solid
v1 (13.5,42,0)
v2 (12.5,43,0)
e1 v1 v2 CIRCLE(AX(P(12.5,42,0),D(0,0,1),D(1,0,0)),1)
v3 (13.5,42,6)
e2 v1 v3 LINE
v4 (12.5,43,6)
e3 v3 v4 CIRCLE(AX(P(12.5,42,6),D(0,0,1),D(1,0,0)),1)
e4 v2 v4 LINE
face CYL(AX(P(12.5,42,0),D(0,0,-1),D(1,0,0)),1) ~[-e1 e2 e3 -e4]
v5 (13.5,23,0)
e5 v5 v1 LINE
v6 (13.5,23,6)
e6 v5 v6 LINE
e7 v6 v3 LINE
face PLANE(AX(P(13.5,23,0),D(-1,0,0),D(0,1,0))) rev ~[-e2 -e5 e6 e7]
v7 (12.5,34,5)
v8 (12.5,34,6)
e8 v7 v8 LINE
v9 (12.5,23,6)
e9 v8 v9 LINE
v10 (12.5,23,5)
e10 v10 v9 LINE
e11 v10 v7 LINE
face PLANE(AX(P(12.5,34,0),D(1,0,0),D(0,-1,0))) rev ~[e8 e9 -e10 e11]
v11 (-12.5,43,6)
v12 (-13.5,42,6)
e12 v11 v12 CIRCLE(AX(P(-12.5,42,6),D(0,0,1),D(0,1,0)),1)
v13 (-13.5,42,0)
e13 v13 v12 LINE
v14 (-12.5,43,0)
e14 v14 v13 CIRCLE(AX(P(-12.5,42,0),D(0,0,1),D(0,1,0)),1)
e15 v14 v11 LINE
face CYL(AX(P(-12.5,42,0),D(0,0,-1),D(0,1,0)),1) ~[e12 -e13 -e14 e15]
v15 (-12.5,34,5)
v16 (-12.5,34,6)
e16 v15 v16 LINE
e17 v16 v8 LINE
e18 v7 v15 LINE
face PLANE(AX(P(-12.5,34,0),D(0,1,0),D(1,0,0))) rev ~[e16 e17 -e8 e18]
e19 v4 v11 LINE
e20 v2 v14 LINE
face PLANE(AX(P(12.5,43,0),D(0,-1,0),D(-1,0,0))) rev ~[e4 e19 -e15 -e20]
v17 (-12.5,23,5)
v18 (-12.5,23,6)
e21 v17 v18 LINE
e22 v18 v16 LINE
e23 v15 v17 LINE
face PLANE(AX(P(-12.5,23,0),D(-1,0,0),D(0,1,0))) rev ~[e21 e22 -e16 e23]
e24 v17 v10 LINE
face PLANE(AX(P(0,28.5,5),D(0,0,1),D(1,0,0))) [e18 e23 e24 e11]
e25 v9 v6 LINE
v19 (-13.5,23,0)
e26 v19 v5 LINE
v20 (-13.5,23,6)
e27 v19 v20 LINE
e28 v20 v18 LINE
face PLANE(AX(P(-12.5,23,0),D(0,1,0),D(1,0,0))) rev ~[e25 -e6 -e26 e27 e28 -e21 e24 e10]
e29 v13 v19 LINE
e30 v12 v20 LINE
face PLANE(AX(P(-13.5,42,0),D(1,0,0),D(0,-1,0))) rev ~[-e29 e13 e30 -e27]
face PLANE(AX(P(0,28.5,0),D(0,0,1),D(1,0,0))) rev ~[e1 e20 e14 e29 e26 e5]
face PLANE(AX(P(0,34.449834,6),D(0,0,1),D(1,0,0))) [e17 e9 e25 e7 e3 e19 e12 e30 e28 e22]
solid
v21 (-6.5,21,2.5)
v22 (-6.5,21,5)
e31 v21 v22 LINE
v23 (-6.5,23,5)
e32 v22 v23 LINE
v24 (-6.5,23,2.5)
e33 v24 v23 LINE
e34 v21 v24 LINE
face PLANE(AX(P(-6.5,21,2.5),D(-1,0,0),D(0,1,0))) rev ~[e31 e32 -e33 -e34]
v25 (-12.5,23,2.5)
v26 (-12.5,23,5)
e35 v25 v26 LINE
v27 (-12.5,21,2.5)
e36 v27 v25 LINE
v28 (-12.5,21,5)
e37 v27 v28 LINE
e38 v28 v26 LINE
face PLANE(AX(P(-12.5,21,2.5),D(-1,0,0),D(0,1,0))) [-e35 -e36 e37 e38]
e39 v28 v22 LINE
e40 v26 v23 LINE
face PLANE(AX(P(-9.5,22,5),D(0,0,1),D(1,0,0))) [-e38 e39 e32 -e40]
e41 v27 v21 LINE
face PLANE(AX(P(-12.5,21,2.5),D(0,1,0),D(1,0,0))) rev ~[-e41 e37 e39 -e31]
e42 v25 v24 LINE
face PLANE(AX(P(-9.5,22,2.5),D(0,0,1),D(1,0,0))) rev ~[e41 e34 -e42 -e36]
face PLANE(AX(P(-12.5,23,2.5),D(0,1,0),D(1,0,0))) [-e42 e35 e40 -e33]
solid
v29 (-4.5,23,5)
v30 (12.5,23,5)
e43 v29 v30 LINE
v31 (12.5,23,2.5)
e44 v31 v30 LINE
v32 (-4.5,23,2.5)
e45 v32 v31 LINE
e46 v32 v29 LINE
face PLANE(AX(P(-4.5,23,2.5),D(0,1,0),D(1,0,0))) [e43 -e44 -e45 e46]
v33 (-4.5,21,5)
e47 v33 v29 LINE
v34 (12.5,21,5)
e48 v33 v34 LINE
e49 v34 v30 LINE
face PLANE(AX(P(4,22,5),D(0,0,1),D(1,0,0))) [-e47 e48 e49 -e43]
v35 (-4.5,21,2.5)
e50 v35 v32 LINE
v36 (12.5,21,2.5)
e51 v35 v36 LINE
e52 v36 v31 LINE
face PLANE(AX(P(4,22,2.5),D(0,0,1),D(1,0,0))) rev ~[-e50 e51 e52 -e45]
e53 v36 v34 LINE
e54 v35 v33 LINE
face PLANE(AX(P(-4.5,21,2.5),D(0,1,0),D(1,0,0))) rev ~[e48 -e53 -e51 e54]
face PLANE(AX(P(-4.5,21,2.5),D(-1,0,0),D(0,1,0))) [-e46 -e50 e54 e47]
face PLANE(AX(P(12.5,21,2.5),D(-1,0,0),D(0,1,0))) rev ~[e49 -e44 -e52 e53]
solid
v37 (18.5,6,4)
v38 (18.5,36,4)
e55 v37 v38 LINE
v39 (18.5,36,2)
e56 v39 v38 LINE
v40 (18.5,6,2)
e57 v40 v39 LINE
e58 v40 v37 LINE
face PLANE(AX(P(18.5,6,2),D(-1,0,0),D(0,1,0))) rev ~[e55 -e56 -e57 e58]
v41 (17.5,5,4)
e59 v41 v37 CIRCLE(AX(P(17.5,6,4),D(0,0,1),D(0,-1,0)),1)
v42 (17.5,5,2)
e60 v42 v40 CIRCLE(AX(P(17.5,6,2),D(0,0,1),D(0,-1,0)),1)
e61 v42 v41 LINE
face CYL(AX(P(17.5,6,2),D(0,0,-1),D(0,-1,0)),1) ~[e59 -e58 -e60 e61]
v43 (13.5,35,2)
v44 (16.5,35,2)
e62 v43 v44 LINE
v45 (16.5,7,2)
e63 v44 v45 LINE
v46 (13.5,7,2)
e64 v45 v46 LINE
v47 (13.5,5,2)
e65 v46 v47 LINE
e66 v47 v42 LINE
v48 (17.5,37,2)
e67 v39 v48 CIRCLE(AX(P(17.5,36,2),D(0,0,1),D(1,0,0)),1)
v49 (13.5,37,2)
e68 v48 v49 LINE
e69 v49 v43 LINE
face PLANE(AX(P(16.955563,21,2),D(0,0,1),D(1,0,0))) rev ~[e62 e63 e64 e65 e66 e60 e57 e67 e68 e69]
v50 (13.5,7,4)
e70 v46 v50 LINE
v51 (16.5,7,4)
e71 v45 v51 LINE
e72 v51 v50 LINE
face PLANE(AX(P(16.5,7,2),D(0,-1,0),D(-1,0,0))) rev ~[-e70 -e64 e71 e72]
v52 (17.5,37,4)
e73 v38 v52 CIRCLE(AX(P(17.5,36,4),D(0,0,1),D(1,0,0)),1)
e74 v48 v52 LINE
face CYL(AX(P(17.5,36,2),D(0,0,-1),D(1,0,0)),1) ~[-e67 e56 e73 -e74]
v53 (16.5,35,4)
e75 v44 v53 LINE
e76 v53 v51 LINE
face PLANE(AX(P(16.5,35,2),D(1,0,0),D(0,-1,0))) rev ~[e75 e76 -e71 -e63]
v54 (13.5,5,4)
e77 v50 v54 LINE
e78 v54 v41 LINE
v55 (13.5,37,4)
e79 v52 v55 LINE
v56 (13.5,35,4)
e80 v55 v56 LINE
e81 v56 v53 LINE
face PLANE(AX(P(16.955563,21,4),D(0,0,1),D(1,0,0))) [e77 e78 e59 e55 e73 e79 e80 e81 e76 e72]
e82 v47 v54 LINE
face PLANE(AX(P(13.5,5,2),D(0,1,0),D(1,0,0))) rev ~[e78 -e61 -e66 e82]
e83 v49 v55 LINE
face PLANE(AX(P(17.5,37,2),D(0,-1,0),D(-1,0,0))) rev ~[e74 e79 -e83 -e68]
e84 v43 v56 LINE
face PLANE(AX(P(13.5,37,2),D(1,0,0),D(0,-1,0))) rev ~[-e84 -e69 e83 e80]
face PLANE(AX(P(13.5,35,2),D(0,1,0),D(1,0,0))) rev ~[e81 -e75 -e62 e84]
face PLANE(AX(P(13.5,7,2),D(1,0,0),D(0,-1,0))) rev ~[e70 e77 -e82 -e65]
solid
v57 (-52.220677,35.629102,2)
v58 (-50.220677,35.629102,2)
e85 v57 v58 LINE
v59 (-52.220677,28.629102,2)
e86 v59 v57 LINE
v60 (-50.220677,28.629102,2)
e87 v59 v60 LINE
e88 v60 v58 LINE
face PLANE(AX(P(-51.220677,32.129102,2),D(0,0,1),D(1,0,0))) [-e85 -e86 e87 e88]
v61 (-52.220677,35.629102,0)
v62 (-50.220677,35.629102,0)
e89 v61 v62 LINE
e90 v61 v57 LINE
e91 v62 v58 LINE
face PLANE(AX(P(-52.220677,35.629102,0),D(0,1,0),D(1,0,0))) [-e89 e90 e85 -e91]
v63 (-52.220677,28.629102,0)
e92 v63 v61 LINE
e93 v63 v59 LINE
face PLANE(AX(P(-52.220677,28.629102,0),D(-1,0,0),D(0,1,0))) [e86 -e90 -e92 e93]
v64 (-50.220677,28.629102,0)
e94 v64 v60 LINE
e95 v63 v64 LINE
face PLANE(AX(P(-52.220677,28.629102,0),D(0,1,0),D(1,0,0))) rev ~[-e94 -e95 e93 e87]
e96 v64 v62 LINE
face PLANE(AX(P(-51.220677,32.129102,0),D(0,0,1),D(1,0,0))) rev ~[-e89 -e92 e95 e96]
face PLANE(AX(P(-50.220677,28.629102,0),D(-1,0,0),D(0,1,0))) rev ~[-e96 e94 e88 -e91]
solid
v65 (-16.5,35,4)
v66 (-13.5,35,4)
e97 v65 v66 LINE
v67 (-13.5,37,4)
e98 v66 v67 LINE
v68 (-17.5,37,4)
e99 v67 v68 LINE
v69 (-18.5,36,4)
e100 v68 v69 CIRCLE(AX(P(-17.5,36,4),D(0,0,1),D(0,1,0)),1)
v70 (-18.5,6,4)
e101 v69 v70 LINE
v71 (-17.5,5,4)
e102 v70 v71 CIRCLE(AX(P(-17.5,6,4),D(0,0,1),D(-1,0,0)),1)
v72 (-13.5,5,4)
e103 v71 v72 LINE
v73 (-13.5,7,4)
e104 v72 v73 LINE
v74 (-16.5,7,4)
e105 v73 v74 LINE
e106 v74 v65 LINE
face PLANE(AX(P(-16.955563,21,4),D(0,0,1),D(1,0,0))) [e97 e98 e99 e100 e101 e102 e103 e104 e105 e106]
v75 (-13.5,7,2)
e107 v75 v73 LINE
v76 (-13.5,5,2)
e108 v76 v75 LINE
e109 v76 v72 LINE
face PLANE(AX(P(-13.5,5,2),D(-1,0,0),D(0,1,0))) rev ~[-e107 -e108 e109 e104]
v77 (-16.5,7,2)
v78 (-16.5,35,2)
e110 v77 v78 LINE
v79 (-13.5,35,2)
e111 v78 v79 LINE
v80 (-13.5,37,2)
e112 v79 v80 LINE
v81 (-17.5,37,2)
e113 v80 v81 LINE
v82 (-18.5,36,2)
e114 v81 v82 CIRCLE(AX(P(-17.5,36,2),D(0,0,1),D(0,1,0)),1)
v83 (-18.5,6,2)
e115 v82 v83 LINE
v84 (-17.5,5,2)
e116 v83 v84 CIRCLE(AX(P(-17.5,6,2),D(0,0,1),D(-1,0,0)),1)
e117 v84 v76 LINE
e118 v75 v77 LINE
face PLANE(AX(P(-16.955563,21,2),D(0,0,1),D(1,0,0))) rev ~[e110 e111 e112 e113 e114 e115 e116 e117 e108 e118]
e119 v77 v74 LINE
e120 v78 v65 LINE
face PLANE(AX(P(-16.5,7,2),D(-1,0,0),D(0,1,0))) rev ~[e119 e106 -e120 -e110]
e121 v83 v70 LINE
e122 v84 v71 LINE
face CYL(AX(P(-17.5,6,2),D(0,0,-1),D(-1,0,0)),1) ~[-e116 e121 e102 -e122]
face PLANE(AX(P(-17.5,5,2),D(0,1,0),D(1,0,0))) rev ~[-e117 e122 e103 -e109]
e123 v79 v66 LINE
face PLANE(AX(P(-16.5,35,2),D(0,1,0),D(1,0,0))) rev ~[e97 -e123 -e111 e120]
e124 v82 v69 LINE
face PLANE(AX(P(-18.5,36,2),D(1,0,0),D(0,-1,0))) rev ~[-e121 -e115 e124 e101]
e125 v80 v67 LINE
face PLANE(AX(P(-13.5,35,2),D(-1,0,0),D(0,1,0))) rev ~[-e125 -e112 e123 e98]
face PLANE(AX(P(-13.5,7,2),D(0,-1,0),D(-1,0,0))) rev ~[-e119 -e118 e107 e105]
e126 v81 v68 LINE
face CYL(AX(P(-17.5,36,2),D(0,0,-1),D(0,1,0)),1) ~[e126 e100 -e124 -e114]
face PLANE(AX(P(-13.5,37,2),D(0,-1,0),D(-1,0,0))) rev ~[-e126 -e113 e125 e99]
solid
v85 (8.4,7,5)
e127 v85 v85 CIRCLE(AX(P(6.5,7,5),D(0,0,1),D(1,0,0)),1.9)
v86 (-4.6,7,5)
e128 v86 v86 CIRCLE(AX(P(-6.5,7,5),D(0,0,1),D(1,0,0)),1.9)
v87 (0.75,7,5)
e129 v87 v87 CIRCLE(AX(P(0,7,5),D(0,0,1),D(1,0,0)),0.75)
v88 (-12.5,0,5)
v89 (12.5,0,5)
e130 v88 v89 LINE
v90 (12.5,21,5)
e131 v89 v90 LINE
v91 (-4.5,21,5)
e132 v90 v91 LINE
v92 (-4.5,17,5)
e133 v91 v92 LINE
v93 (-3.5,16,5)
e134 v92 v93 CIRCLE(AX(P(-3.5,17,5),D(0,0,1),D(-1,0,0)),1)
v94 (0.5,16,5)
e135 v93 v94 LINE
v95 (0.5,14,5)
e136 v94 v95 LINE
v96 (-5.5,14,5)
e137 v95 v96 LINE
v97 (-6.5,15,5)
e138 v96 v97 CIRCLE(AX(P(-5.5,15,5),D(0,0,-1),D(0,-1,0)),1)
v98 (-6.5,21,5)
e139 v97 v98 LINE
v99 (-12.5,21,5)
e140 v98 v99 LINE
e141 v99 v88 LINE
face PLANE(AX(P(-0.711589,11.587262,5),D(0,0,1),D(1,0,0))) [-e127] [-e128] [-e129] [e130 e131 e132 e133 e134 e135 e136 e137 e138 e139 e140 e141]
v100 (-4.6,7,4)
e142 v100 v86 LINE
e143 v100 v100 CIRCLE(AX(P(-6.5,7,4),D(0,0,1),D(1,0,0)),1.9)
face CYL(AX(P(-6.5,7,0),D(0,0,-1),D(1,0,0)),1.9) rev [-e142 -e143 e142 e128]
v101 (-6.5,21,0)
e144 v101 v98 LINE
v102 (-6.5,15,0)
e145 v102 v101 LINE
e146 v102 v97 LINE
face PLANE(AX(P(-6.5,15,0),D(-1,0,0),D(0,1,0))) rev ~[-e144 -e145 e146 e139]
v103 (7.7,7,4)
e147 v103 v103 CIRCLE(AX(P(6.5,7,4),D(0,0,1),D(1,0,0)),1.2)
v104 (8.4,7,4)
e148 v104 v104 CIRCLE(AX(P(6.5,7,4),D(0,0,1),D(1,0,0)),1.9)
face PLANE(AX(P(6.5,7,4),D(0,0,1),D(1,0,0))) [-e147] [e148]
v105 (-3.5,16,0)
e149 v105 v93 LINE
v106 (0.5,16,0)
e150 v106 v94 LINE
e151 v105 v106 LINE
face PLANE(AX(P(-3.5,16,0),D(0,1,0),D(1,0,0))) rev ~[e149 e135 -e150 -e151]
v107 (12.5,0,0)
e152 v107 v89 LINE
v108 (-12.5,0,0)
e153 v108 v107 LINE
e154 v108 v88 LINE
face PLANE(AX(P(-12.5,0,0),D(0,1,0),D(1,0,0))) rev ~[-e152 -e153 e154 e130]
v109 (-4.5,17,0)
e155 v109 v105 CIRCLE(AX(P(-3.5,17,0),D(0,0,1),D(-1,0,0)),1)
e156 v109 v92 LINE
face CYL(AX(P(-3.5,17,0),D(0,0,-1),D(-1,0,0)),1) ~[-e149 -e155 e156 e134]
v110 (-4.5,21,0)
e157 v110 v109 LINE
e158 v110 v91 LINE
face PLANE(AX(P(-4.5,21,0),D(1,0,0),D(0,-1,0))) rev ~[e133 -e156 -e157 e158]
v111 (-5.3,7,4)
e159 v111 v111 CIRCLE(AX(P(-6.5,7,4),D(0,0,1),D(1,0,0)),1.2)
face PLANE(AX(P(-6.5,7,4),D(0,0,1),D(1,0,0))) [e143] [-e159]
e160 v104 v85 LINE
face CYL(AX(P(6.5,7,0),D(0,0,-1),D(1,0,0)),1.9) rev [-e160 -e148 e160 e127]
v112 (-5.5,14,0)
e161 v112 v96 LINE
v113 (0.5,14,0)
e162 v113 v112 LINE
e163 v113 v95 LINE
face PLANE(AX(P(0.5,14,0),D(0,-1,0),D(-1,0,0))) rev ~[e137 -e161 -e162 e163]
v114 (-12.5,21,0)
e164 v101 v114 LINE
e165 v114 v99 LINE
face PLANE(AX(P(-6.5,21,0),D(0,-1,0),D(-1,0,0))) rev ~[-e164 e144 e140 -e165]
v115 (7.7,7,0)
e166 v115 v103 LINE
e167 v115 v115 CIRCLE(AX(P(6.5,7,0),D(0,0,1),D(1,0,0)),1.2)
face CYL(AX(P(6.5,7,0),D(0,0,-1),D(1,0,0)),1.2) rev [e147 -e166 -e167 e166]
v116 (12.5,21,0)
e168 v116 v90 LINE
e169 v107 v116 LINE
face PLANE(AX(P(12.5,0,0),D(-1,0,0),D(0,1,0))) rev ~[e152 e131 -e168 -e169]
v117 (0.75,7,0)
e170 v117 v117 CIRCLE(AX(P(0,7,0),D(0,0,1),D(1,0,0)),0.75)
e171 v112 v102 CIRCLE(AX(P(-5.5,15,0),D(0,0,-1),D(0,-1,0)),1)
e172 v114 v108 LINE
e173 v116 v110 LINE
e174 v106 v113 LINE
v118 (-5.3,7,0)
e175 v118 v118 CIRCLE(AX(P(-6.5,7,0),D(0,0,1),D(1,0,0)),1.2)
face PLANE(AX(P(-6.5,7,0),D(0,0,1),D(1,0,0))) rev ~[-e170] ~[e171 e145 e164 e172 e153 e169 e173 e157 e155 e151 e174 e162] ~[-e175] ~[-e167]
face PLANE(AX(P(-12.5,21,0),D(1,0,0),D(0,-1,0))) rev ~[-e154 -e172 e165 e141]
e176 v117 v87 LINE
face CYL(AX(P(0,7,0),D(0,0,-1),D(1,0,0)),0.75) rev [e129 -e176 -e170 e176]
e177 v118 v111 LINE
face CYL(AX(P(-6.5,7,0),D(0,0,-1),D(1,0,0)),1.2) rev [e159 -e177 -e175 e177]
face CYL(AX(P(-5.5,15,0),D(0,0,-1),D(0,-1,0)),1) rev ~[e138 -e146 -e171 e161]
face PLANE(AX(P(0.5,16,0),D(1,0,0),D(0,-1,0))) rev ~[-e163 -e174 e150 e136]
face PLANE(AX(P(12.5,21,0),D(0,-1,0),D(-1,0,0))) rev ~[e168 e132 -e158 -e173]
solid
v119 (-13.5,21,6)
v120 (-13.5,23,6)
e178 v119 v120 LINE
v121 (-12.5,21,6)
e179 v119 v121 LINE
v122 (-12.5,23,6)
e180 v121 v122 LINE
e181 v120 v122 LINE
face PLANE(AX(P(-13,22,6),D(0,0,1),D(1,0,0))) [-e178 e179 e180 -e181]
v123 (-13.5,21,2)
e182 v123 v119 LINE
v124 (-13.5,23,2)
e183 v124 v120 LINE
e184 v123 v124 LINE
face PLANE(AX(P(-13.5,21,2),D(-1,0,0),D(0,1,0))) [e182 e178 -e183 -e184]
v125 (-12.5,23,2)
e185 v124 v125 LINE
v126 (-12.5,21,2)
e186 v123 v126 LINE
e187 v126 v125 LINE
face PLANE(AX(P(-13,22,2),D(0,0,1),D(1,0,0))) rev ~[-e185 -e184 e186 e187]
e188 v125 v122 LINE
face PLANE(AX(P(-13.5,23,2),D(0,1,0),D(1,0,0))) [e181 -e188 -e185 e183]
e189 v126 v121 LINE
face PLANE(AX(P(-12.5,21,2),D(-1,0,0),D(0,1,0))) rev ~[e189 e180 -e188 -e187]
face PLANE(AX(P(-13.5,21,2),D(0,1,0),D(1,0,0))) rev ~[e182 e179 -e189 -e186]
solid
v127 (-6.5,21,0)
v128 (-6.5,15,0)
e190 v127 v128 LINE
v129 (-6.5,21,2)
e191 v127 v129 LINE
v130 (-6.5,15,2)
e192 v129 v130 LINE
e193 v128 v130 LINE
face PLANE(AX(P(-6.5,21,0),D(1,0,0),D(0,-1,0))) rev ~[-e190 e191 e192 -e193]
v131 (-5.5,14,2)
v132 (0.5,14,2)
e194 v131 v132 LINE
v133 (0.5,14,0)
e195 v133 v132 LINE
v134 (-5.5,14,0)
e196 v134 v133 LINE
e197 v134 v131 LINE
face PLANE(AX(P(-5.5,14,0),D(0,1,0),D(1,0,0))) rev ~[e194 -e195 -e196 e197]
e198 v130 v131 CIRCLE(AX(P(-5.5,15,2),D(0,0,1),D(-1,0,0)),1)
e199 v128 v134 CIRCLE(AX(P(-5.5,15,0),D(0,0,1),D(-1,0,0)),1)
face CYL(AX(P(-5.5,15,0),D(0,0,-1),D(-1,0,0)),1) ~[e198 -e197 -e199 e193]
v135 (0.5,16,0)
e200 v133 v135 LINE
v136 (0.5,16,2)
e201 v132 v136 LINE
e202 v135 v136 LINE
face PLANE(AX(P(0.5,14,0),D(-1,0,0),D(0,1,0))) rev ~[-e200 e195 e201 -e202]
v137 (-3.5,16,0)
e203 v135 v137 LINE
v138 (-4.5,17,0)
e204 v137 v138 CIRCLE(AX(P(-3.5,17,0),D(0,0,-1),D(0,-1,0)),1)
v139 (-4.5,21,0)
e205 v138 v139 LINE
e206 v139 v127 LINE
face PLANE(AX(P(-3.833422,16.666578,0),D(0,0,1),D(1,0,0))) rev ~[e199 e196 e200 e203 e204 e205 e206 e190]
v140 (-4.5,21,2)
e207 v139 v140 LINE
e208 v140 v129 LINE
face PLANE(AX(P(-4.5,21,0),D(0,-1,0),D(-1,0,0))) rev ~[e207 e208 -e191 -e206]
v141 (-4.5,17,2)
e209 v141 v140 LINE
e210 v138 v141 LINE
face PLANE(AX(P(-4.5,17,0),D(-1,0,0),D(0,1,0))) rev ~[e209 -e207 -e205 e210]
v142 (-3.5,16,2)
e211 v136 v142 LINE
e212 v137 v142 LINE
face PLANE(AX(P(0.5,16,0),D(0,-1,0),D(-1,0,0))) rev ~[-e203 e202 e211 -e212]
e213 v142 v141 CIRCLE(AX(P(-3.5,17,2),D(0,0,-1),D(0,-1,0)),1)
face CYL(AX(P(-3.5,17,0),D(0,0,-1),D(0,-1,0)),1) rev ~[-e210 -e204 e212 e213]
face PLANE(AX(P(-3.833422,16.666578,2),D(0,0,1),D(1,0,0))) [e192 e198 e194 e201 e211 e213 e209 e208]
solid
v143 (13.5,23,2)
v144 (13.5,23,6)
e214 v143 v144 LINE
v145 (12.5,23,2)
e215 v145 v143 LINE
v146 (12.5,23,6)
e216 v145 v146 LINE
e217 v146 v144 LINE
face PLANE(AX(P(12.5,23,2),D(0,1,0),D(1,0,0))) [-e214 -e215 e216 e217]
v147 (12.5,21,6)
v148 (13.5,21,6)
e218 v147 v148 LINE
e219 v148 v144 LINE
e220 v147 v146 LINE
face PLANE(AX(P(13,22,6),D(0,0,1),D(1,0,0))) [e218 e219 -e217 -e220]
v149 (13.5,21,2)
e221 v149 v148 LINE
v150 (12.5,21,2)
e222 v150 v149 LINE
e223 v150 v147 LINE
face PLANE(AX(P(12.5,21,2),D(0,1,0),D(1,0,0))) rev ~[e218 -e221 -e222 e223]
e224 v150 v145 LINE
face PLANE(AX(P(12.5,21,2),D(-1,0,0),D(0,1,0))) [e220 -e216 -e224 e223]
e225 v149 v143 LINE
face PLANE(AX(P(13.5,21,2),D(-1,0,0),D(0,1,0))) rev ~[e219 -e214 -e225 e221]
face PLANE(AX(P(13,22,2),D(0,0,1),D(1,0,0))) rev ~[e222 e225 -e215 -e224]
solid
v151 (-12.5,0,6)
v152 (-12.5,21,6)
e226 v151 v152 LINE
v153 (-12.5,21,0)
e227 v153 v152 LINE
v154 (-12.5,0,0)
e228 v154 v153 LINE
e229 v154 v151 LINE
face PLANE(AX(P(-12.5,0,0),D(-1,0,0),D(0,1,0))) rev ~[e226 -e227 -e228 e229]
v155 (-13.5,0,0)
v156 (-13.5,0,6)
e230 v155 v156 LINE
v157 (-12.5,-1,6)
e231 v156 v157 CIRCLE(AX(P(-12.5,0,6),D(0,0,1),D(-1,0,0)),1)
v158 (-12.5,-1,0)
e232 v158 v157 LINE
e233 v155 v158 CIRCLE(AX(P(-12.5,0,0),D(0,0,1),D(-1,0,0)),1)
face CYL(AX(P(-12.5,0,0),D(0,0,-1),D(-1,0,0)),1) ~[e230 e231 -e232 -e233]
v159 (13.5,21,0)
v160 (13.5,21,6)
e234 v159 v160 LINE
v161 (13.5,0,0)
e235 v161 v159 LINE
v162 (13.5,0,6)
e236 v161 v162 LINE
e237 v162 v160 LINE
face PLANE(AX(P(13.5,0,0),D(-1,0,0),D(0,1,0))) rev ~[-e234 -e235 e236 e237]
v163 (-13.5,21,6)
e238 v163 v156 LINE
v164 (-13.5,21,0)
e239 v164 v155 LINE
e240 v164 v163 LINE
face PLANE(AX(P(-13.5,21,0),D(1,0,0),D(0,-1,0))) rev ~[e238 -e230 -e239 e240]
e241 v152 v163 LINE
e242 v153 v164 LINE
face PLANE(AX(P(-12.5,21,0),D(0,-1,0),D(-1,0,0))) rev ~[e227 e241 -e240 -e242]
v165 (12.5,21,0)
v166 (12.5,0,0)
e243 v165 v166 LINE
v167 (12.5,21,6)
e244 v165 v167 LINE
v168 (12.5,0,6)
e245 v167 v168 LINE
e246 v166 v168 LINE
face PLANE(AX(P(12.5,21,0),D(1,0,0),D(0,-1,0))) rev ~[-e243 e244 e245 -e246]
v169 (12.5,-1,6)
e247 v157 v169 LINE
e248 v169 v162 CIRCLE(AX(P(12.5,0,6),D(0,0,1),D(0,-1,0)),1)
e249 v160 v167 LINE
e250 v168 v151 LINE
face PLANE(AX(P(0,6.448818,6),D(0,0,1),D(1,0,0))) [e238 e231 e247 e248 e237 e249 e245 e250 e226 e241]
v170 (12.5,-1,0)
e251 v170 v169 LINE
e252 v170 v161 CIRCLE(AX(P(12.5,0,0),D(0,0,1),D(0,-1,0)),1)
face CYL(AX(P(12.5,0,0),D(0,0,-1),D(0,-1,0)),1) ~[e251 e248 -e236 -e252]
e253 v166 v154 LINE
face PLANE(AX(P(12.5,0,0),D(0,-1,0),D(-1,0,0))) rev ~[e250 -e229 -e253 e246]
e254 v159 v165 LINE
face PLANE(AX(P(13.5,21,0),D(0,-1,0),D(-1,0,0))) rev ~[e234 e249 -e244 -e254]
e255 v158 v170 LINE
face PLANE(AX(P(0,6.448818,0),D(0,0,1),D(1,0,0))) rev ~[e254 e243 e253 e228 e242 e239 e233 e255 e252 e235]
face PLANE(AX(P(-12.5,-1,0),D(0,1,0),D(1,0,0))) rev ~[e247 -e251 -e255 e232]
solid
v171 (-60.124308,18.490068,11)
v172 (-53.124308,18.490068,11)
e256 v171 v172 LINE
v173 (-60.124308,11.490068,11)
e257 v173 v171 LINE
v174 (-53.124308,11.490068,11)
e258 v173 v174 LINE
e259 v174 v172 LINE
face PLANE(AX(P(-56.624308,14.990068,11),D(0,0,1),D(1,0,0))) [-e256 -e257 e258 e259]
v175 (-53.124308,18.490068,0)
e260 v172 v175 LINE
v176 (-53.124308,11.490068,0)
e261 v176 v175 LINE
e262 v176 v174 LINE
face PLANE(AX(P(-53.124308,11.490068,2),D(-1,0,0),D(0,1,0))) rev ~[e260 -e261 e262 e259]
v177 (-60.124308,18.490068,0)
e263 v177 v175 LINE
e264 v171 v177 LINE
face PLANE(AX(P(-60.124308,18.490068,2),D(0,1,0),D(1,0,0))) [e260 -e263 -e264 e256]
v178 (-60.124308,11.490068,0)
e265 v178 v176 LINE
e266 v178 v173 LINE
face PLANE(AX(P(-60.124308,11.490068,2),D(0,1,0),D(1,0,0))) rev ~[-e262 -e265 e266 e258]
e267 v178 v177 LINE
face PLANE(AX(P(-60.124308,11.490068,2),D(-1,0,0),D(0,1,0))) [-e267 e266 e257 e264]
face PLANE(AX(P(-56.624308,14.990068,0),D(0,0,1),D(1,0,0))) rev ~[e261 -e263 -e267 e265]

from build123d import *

# Parameters (mm, degrees)
F1_DEPTH  = 6
F0_R      = 1.9
F0_R_2    = 0.75
F2_DEPTH  = 5
F3_START  = 2
F3_DEPTH  = 2
F4_START  = 2
F0_W      = 1
F0_H      = 2
F4_DEPTH  = 4
F5_START  = 2.5
F0_W_2    = 6
F5_DEPTH  = 2.5
F0_W_3    = 17
F6_DEPTH  = 2
F0_R_3    = 1.2
F7_DEPTH  = 4
F8_W      = 2
F8_H      = 7
F9_DEPTH  = 2
F8_W_2    = 7
F10_DEPTH = 9


with BuildPart() as f1:
    # F0 (on Top) → F1 (new body)
    with BuildSketch(Plane.XY):
        with BuildLine():
            Line((12.5, 0), (0, 0))
            Line((0, 0), (-12.5, 0))
            Line((-12.5, 0), (-12.5, 21))
            Line((-12.5, 21), (-13.5, 21))
            Line((-13.5, 21), (-13.5, 7))
            Line((-13.5, 7), (-13.5, 5))
            Line((-13.5, 5), (-13.5, 0))
            ThreePointArc((-13.5, 0), (-13.2071067812, -0.7071067812), (-12.5, -1))
            Line((-12.5, -1), (0, -1))
            Line((0, -1), (12.5, -1))
            ThreePointArc((12.5, -1), (13.2071067812, -0.7071067812), (13.5, 0))
            Line((13.5, 0), (13.5, 5))
            Line((13.5, 5), (13.5, 7))
            Line((13.5, 7), (13.5, 21))
            Line((13.5, 21), (12.5, 21))
            Line((12.5, 21), (12.5, 0))
        make_face()
    extrude(amount=F1_DEPTH)


with BuildPart() as f1b:
    # F0 (on Top) → F1, piece 2 (new body)
    with BuildSketch(Plane.XY):
        with BuildLine():
            Line((-13.5, 23), (-12.5, 23))
            Line((-12.5, 23), (-12.5, 34))
            Line((-12.5, 34), (0, 34))
            Line((0, 34), (12.5, 34))
            Line((12.5, 34), (12.5, 23))
            Line((12.5, 23), (13.5, 23))
            Line((13.5, 23), (13.5, 35))
            Line((13.5, 35), (13.5, 37))
            Line((13.5, 37), (13.5, 42))
            ThreePointArc((13.5, 42), (13.2071067812, 42.7071067812), (12.5, 43))
            Line((12.5, 43), (0, 43))
            Line((0, 43), (-12.5, 43))
            ThreePointArc((-12.5, 43), (-13.2071067812, 42.7071067812), (-13.5, 42))
            Line((-13.5, 42), (-13.5, 37))
            Line((-13.5, 37), (-13.5, 35))
            Line((-13.5, 35), (-13.5, 23))
        make_face()
    extrude(amount=F1_DEPTH)

    # F0 (on Top) → F2, piece 2 (join)
    with BuildSketch(Plane.XY):
        Polygon((-12.5, 34), (-12.5, 23), (-6.5, 23), (-4.5, 23), (12.5, 23), (12.5, 34), (0, 34), align=None)
    extrude(amount=F2_DEPTH)


with BuildPart() as f2:
    # F0 (on Top) → F2 (new body)
    with BuildSketch(Plane.XY):
        with BuildLine():
            Line((-12.5, 0), (0, 0))
            Line((0, 0), (12.5, 0))
            Line((12.5, 0), (12.5, 21))
            Line((12.5, 21), (-4.5, 21))
            Line((-4.5, 21), (-4.5, 17))
            ThreePointArc((-4.5, 17), (-4.2071067812, 16.2928932188), (-3.5, 16))
            Line((-3.5, 16), (0.5, 16))
            Line((0.5, 16), (0.5, 14))
            Line((0.5, 14), (-2.5, 14))
            Line((-2.5, 14), (-5.5, 14))
            ThreePointArc((-5.5, 14), (-6.2071067812, 14.2928932188), (-6.5, 15))
            Line((-6.5, 15), (-6.5, 21))
            Line((-6.5, 21), (-12.5, 21))
            Line((-12.5, 21), (-12.5, 0))
        make_face()
        with Locations((-6.5, 7)):
            Circle(F0_R, mode=Mode.SUBTRACT)
        with Locations((0, 7)):
            Circle(F0_R_2, mode=Mode.SUBTRACT)
        with Locations((6.5, 7)):
            Circle(F0_R, mode=Mode.SUBTRACT)
    extrude(amount=F2_DEPTH)

    # F0 (on Top) → F7 (join)
    with BuildSketch(Plane.XY):
        with Locations((-6.5, 7)):
            Circle(F0_R)
        with Locations((-6.5, 7)):
            Circle(F0_R_3, mode=Mode.SUBTRACT)
        with Locations((6.5, 7)):
            Circle(F0_R)
        with Locations((6.5, 7)):
            Circle(F0_R_3, mode=Mode.SUBTRACT)
    extrude(amount=F7_DEPTH)


with BuildPart() as f3:
    # F0 (on Top) → F3 (new body)
    with BuildSketch(Plane.XY.offset(F3_START)):
        with BuildLine():
            Line((-13.5, 5), (-13.5, 7))
            Line((-13.5, 7), (-16.5, 7))
            Line((-16.5, 7), (-16.5, 35))
            Line((-16.5, 35), (-13.5, 35))
            Line((-13.5, 35), (-13.5, 37))
            Line((-13.5, 37), (-17.5, 37))
            ThreePointArc((-17.5, 37), (-18.2071067812, 36.7071067812), (-18.5, 36))
            Line((-18.5, 36), (-18.5, 6))
            ThreePointArc((-18.5, 6), (-18.2071067812, 5.2928932188), (-17.5, 5))
            Line((-17.5, 5), (-13.5, 5))
        make_face()
    extrude(amount=F3_DEPTH)


with BuildPart() as f3b:
    # F0 (on Top) → F3, piece 2 (new body)
    with BuildSketch(Plane.XY.offset(F3_START)):
        with BuildLine():
            Line((16.5, 7), (13.5, 7))
            Line((13.5, 7), (13.5, 5))
            Line((13.5, 5), (17.5, 5))
            ThreePointArc((17.5, 5), (18.2071067812, 5.2928932188), (18.5, 6))
            Line((18.5, 6), (18.5, 36))
            ThreePointArc((18.5, 36), (18.2071067812, 36.7071067812), (17.5, 37))
            Line((17.5, 37), (13.5, 37))
            Line((13.5, 37), (13.5, 35))
            Line((13.5, 35), (16.5, 35))
            Line((16.5, 35), (16.5, 7))
        make_face()
    extrude(amount=F3_DEPTH)


with BuildPart() as f4:
    # F0 (on Top) → F4 (new body)
    with BuildSketch(Plane.XY.offset(F4_START)):
        with Locations((-13, 22)):
            Rectangle(F0_W, F0_H)
    extrude(amount=F4_DEPTH)


with BuildPart() as f4b:
    # F0 (on Top) → F4, piece 2 (new body)
    with BuildSketch(Plane.XY.offset(F4_START)):
        with Locations((13, 22)):
            Rectangle(F0_W, F0_H)
    extrude(amount=F4_DEPTH)


with BuildPart() as f5:
    # F0 (on Top) → F5 (new body)
    with BuildSketch(Plane.XY.offset(F5_START)):
        with Locations((-9.5, 22)):
            Rectangle(F0_W_2, F0_H)
    extrude(amount=F5_DEPTH)


with BuildPart() as f5b:
    # F0 (on Top) → F5, piece 2 (new body)
    with BuildSketch(Plane.XY.offset(F5_START)):
        with Locations((4, 22)):
            Rectangle(F0_W_3, F0_H)
    extrude(amount=F5_DEPTH)


with BuildPart() as f6:
    # F0 (on Top) → F6 (new body)
    with BuildSketch(Plane.XY):
        with BuildLine():
            Line((-4.5, 21), (-6.5, 21))
            Line((-6.5, 21), (-6.5, 15))
            ThreePointArc((-6.5, 15), (-6.2071067812, 14.2928932188), (-5.5, 14))
            Line((-5.5, 14), (-2.5, 14))
            Line((-2.5, 14), (0.5, 14))
            Line((0.5, 14), (0.5, 16))
            Line((0.5, 16), (-3.5, 16))
            ThreePointArc((-3.5, 16), (-4.2071067812, 16.2928932188), (-4.5, 17))
            Line((-4.5, 17), (-4.5, 21))
        make_face()
    extrude(amount=F6_DEPTH)


with BuildPart() as f9:
    # F8 (on Top) → F9 (new body)
    with BuildSketch(Plane.XY):
        with Locations((-51.2206767944, 32.1291023865)):
            Rectangle(F8_W, F8_H)
    extrude(amount=F9_DEPTH)


with BuildPart() as f9b:
    # F8 (on Top) → F9, piece 2 (new body)
    with BuildSketch(Plane.XY):
        with Locations((-56.6243078709, 14.9900683984)):
            Rectangle(F8_W_2, F8_H)
    extrude(amount=F9_DEPTH)

    # F10 (add): a face of the model
    f10_faces = [f9b.faces().sort_by_distance(p)[0] for p in [
        (-56.6243078709, 14.9900683984, 2),
    ]]
    extrude(f10_faces, amount=F10_DEPTH)


solid = Compound([f1.part, f1b.part, f2.part, f3.part, f3b.part, f4.part, f4b.part, f5.part, f5b.part, f6.part, f9.part, f9b.part])
